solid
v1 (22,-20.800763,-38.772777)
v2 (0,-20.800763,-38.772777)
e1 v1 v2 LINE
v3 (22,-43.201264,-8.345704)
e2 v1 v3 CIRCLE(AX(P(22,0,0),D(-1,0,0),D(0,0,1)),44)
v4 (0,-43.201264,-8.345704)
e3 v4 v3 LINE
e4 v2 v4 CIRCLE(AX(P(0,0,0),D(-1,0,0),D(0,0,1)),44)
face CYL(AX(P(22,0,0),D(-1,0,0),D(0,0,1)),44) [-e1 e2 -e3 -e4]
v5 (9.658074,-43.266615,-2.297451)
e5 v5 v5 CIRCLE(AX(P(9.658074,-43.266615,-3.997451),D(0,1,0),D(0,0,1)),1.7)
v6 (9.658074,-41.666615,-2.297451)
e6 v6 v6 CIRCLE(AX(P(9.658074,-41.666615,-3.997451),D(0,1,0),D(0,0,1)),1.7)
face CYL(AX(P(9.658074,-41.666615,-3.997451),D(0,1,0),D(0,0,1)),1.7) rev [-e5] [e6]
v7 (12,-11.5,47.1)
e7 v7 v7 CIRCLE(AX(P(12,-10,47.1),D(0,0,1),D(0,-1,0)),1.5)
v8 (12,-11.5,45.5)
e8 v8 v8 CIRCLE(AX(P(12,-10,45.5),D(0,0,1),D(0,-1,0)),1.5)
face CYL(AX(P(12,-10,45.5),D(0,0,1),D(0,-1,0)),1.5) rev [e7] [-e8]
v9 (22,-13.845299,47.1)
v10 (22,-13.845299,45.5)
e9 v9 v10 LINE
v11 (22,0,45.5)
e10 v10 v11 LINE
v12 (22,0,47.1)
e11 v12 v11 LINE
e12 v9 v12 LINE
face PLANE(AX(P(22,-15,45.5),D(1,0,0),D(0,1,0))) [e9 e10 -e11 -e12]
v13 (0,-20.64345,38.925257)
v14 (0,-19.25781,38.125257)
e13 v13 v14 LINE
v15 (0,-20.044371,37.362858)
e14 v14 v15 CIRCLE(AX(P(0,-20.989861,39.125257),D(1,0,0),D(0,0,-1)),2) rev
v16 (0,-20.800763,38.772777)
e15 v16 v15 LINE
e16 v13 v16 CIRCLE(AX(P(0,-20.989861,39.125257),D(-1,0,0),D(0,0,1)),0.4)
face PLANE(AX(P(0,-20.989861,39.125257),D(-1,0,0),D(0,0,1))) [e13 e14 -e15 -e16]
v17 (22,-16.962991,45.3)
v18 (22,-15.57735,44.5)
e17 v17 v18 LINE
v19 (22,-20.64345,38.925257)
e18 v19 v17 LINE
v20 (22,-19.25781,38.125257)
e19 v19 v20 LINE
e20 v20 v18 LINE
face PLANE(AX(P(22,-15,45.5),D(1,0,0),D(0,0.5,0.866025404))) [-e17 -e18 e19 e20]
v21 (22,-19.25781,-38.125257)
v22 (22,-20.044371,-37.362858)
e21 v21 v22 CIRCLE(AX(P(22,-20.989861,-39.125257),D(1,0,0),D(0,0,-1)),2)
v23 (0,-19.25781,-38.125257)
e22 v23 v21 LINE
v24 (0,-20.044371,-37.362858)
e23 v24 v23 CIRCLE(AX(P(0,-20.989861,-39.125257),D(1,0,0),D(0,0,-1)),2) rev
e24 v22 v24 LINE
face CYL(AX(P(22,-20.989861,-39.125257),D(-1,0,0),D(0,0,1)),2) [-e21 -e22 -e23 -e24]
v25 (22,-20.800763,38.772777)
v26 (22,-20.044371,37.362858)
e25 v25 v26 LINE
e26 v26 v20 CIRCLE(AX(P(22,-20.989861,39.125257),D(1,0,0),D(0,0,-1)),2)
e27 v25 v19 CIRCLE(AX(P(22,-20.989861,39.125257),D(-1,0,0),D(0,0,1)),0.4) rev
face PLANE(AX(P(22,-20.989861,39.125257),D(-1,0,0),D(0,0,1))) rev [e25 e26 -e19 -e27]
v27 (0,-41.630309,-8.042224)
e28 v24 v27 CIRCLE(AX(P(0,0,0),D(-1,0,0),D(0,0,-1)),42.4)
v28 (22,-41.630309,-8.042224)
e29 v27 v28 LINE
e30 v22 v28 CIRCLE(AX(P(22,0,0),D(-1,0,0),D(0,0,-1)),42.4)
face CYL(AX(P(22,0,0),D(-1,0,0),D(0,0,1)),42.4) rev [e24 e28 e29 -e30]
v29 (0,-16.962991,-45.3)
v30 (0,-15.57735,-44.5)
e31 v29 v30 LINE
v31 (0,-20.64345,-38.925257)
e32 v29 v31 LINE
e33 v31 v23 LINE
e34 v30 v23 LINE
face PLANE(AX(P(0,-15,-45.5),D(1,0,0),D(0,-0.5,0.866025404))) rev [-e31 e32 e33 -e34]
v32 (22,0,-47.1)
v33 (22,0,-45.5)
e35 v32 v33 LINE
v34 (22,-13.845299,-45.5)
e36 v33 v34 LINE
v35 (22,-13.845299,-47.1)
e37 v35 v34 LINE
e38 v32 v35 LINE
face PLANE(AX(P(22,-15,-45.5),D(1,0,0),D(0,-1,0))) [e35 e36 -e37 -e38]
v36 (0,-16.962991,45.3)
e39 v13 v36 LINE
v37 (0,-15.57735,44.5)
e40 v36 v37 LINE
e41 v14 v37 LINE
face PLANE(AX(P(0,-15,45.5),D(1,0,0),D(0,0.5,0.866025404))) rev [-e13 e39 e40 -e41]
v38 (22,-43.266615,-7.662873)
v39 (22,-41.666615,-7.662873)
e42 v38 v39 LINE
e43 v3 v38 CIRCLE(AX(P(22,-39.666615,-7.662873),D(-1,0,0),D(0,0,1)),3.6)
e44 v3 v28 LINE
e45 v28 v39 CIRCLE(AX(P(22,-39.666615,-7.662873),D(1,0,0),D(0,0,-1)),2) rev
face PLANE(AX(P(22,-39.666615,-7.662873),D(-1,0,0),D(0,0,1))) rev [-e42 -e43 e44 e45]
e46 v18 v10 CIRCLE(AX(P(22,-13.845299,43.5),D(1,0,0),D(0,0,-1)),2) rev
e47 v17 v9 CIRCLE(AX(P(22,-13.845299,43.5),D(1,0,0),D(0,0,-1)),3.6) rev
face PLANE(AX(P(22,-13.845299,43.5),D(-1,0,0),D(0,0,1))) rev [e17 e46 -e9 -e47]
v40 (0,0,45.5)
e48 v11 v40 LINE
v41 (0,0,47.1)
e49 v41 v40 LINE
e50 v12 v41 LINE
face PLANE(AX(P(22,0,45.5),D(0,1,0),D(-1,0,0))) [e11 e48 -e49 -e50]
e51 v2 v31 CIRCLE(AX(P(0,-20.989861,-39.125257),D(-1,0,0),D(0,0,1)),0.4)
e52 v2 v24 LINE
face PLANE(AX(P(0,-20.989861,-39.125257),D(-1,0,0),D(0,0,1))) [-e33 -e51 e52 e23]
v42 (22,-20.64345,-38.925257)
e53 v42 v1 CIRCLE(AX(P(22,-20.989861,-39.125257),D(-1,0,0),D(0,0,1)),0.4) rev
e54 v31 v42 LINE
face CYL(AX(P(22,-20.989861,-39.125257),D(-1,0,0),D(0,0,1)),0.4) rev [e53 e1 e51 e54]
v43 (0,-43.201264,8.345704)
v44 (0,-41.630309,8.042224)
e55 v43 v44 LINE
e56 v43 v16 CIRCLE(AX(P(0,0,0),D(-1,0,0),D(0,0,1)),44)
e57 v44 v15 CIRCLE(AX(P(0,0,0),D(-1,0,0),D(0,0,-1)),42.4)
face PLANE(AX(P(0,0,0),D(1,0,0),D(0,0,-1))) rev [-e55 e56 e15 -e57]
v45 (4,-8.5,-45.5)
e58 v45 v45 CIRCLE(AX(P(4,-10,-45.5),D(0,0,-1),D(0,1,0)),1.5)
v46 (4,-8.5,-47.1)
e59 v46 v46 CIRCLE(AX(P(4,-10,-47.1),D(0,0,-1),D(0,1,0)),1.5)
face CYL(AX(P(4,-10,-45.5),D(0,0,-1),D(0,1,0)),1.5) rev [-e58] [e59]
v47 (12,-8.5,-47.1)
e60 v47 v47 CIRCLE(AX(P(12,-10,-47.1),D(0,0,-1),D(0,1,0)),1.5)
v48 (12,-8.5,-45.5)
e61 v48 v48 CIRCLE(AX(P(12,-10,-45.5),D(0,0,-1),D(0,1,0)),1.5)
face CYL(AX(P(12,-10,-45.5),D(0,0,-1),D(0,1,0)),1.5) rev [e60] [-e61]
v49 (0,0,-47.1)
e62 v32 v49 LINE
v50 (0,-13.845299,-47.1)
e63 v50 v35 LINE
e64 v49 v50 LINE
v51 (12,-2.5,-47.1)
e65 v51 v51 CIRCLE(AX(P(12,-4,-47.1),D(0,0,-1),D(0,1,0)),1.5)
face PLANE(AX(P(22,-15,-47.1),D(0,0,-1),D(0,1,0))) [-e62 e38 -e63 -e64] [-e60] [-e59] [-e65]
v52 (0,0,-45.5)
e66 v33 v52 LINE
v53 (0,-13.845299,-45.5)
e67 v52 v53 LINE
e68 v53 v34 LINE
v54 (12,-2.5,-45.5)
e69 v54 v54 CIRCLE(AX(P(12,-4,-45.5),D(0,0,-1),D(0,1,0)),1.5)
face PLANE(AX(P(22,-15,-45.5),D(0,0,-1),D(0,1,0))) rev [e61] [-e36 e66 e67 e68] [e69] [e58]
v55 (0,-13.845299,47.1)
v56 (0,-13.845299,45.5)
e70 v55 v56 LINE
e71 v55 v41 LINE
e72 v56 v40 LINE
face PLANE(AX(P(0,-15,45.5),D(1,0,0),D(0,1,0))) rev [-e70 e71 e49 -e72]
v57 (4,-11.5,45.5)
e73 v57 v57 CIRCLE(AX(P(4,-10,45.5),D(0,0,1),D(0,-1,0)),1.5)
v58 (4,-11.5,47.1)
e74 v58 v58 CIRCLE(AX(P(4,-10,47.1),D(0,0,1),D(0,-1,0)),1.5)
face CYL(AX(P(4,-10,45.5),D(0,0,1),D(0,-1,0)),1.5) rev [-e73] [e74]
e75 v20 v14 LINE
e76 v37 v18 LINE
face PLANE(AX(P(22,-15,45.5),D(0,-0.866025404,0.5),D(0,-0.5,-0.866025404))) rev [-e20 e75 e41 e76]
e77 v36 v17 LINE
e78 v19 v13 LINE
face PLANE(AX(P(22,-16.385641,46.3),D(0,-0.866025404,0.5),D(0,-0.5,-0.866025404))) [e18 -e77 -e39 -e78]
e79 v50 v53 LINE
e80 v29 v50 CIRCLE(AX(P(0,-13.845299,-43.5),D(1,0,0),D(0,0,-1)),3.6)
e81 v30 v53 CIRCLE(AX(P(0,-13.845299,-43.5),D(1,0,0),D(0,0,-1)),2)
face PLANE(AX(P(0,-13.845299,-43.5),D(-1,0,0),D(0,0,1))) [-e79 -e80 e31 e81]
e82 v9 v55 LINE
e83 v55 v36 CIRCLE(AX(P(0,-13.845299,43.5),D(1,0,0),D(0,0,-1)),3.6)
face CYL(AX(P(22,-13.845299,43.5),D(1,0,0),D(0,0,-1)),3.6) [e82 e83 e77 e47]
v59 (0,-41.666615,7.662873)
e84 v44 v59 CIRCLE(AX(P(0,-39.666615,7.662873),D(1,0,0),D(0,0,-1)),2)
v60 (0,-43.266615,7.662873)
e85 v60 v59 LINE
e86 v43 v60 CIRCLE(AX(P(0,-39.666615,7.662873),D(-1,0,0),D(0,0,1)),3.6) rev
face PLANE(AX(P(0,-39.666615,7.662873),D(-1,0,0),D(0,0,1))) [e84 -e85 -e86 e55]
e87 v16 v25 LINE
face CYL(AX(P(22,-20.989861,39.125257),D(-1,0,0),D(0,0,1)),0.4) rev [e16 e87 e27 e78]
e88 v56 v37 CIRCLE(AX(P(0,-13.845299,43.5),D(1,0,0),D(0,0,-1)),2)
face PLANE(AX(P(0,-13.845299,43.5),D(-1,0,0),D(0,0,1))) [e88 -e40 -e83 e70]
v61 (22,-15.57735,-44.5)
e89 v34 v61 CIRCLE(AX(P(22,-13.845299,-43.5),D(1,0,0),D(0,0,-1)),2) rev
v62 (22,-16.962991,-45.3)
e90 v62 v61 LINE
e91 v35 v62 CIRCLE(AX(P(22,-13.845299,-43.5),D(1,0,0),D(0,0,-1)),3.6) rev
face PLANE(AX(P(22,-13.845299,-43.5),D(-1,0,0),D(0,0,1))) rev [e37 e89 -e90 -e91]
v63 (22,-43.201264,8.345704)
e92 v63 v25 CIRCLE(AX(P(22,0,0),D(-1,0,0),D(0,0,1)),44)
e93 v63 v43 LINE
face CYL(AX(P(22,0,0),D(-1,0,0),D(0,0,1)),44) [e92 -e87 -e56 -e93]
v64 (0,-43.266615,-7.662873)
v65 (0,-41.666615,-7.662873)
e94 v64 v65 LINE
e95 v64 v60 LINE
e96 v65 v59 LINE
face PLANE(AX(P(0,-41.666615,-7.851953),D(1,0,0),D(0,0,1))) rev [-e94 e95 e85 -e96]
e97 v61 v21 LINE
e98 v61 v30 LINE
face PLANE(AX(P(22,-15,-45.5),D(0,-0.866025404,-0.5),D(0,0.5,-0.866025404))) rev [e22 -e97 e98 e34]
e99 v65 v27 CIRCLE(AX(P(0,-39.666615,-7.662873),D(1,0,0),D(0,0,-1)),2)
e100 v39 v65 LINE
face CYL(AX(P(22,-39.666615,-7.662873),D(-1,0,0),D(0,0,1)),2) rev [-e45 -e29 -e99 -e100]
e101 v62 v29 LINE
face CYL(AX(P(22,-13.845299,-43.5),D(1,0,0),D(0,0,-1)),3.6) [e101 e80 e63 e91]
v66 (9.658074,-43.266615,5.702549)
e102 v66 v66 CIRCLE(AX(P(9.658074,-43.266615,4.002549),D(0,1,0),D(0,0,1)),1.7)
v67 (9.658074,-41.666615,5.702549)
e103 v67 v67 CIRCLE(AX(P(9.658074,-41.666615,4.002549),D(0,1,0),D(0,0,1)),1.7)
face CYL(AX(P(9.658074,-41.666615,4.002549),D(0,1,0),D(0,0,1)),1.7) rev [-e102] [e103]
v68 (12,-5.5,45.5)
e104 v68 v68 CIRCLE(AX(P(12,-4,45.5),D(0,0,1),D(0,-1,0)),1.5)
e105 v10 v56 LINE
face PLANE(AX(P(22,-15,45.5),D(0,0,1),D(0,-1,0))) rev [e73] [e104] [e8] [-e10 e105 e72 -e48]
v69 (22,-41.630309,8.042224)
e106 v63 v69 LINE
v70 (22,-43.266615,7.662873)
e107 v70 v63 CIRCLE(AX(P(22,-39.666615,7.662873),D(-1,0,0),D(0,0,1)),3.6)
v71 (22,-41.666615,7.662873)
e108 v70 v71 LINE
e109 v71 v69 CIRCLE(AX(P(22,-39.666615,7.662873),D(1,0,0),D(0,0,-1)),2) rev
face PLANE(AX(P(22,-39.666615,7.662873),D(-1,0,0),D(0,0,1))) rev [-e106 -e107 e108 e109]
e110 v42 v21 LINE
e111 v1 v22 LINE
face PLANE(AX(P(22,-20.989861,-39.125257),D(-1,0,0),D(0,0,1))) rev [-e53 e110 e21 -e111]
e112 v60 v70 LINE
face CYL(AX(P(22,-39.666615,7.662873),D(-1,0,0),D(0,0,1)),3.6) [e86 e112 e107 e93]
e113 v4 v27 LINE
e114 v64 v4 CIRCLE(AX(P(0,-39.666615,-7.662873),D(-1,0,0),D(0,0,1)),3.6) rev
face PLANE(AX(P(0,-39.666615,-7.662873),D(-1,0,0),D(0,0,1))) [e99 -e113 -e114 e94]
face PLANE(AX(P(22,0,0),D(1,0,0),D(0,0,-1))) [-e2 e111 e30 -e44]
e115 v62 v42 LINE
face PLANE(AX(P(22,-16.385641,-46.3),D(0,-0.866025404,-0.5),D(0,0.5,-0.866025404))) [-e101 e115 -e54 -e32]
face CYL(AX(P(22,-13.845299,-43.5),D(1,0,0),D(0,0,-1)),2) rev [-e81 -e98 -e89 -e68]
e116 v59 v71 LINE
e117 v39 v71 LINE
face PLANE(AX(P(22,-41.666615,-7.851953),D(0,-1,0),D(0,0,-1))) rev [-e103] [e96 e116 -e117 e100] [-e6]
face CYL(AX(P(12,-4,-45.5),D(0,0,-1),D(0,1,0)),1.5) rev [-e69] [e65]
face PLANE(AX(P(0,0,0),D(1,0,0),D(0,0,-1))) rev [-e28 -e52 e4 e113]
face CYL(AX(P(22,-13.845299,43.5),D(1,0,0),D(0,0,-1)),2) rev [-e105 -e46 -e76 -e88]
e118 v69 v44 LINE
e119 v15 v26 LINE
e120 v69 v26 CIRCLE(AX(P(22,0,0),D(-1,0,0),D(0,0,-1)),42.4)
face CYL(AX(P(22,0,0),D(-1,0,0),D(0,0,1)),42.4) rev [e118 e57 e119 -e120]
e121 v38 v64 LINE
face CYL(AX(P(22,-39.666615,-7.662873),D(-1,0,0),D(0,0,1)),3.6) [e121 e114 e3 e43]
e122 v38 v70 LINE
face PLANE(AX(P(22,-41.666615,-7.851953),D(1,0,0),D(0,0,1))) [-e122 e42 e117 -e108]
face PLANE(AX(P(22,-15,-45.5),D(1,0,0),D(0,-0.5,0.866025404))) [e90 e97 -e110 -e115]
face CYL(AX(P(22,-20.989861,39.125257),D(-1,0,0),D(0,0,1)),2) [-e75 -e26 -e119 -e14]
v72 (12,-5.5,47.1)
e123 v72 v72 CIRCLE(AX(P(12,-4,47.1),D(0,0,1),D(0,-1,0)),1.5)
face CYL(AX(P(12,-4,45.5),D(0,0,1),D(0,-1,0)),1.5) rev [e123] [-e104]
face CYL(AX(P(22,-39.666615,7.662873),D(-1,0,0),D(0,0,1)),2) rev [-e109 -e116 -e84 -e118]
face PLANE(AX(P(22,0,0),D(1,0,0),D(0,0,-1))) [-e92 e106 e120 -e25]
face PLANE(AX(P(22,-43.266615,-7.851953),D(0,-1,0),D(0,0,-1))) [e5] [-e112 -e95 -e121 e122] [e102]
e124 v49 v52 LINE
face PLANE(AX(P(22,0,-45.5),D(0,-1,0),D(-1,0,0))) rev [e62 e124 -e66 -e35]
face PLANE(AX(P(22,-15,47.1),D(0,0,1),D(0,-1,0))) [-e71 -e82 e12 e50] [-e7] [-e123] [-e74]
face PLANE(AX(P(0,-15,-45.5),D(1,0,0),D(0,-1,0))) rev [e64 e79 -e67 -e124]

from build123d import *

# Parameters (mm, degrees)
BOSS_EXTRUDE1_DEPTH   = 22
FILLET1_R             = 2
F_3_0MM_DOWEL_HOLE2_D = 3
CONVERT_SOLID1_DEPTH  = 22
M3_CLEARANCE_HOLE1_D  = 3.4


# Read off the part's stored shape, not the designer's step: Convert-Solid1
with BuildPart() as part:
    # Sketch1 → Boss-Extrude1 (new body)
    with BuildSketch(Plane(origin=(0, 0, 0), x_dir=(0, 0, -1), z_dir=(1, 0, 0))):
        with BuildLine():
            Line((-45.5, -15), (-37.62592062, -19.54610185))
            ThreePointArc((-37.62592062, -19.54610185), (-25.286133167, -34.034856683), (-7.851953195, -41.666615306))
            Line((-7.851953195, -41.666615306), (7.851953195, -41.666615306))
            ThreePointArc((7.851953195, -41.666615306), (25.286133167, -34.034856683), (37.62592062, -19.54610185))
            Line((37.62592062, -19.54610185), (45.5, -15))
            Line((45.5, -15), (45.5, 0))
            Line((45.5, 0), (47.1, 0))
            Line((47.1, 0), (47.1, -15.923760431))
            Line((47.1, -15.923760431), (38.826379575, -20.70053741))
            ThreePointArc((38.826379575, -20.70053741), (25.990083184, -35.503740311), (8, -43.266615306))
            Line((8, -43.266615306), (-8, -43.266615306))
            ThreePointArc((-8, -43.266615306), (-25.990083184, -35.503740311), (-38.826379575, -20.70053741))
            Line((-38.826379575, -20.70053741), (-47.1, -15.923760431))
            Line((-47.1, -15.923760431), (-47.1, 0))
            Line((-47.1, 0), (-45.5, 0))
            Line((-45.5, 0), (-45.5, -15))
        make_face()
    extrude(amount=BOSS_EXTRUDE1_DEPTH)

    # Fillet1
    fillet1_edges = [part.edges().sort_by_distance(p)[0] for p in [
        (11, -15.923760431, 47.1),
        (11, -15, 45.5),
        (11, -19.54610185, 37.62592062),
        (11, -41.666615306, 7.851953195),
        (11, -41.666615306, -7.851953195),
        (11, -19.54610185, -37.62592062),
        (11, -15, -45.5),
        (11, -15.923760431, -47.1),
        (11, -20.70053741, -38.826379575),
        (11, -43.266615306, -8),
        (11, -43.266615306, 8),
        (11, -20.70053741, 38.826379575),
    ]]
    fillet(fillet1_edges, radius=FILLET1_R)

    # Ø3.0mm Dowel Hole2 (through all)
    with Locations(Plane.XY.offset(47.1)):
        with Locations((4, -10), (12, -10), (12, -4)):
            Hole(F_3_0MM_DOWEL_HOLE2_D / 2)

    # Convert-Solid1 outline → Convert-Solid1 (cut)
    with BuildSketch(Plane.YZ):
        with BuildLine():
            ThreePointArc((-13.845299462, -47.1), (-15.645299462, -46.617691454), (-16.962990915, -45.3))
            Line((-16.962990915, -45.3), (-16.5011107, -46.1))
            ThreePointArc((-16.5011107, -46.1), (-15.769059892, -46.832050808), (-14.769059892, -47.1))
            Line((-14.769059892, -47.1), (-13.845299462, -47.1))
        make_face()
        with BuildLine():
            Line((-16.5011107, 46.1), (-16.962990915, 45.3))
            ThreePointArc((-16.962990915, 45.3), (-15.645299462, 46.617691454), (-13.845299462, 47.1))
            Line((-13.845299462, 47.1), (-14.769059892, 47.1))
            ThreePointArc((-14.769059892, 47.1), (-15.769059892, 46.832050808), (-16.5011107, 46.1))
        make_face()
        with BuildLine():
            ThreePointArc((-20.41783584, 39.316033057), (-20.750751076, 38.886900575), (-21.186848098, 38.563162055))
            ThreePointArc((-21.186848098, 38.563162055), (-20.994067, 38.668451622), (-20.800762672, 38.772777464))
            ThreePointArc((-20.800762672, 38.772777464), (-20.711463806, 38.838037356), (-20.643450353, 38.925257259))
            Line((-20.643450353, 38.925257259), (-20.41783584, 39.316033057))
        make_face()
        with BuildLine():
            Line((-43.266615306, 7.814503261), (-43.266615306, 7.662873495))
            ThreePointArc((-43.266615306, 7.662873495), (-43.250240286, 8.005848713), (-43.201264194, 8.345703806))
            ThreePointArc((-43.201264194, 8.345703806), (-43.216551408, 8.266177136), (-43.231692225, 8.186622464))
            ThreePointArc((-43.231692225, 8.186622464), (-43.257865395, 8.001380442), (-43.266615306, 7.814503261))
        make_face()
        with BuildLine():
            ThreePointArc((-43.231692225, -8.186622464), (-43.216551408, -8.266177136), (-43.201264194, -8.345703806))
            ThreePointArc((-43.201264194, -8.345703806), (-43.250240286, -8.005848713), (-43.266615306, -7.662873495))
            Line((-43.266615306, -7.662873495), (-43.266615306, -7.814503261))
            ThreePointArc((-43.266615306, -7.814503261), (-43.257865395, -8.001380442), (-43.231692225, -8.186622464))
        make_face()
        with BuildLine():
            ThreePointArc((-21.186848098, -38.563162055), (-20.750751076, -38.886900575), (-20.41783584, -39.316033057))
            Line((-20.41783584, -39.316033057), (-20.643450353, -38.925257259))
            ThreePointArc((-20.643450353, -38.925257259), (-20.711463806, -38.838037356), (-20.800762672, -38.772777464))
            ThreePointArc((-20.800762672, -38.772777464), (-20.994067, -38.668451622), (-21.186848098, -38.563162055))
        make_face()
    extrude(amount=CONVERT_SOLID1_DEPTH, mode=Mode.SUBTRACT)

    # M3 Clearance Hole1 (through all)
    with Locations(Plane(origin=(0, -41.666615306, 0), x_dir=(1, 0, 0), z_dir=(0, 1, 0))):
        with Locations((9.658073919, -4.00254861), (9.658073919, 3.99745139)):
            Hole(M3_CLEARANCE_HOLE1_D / 2)


solid = part.part
